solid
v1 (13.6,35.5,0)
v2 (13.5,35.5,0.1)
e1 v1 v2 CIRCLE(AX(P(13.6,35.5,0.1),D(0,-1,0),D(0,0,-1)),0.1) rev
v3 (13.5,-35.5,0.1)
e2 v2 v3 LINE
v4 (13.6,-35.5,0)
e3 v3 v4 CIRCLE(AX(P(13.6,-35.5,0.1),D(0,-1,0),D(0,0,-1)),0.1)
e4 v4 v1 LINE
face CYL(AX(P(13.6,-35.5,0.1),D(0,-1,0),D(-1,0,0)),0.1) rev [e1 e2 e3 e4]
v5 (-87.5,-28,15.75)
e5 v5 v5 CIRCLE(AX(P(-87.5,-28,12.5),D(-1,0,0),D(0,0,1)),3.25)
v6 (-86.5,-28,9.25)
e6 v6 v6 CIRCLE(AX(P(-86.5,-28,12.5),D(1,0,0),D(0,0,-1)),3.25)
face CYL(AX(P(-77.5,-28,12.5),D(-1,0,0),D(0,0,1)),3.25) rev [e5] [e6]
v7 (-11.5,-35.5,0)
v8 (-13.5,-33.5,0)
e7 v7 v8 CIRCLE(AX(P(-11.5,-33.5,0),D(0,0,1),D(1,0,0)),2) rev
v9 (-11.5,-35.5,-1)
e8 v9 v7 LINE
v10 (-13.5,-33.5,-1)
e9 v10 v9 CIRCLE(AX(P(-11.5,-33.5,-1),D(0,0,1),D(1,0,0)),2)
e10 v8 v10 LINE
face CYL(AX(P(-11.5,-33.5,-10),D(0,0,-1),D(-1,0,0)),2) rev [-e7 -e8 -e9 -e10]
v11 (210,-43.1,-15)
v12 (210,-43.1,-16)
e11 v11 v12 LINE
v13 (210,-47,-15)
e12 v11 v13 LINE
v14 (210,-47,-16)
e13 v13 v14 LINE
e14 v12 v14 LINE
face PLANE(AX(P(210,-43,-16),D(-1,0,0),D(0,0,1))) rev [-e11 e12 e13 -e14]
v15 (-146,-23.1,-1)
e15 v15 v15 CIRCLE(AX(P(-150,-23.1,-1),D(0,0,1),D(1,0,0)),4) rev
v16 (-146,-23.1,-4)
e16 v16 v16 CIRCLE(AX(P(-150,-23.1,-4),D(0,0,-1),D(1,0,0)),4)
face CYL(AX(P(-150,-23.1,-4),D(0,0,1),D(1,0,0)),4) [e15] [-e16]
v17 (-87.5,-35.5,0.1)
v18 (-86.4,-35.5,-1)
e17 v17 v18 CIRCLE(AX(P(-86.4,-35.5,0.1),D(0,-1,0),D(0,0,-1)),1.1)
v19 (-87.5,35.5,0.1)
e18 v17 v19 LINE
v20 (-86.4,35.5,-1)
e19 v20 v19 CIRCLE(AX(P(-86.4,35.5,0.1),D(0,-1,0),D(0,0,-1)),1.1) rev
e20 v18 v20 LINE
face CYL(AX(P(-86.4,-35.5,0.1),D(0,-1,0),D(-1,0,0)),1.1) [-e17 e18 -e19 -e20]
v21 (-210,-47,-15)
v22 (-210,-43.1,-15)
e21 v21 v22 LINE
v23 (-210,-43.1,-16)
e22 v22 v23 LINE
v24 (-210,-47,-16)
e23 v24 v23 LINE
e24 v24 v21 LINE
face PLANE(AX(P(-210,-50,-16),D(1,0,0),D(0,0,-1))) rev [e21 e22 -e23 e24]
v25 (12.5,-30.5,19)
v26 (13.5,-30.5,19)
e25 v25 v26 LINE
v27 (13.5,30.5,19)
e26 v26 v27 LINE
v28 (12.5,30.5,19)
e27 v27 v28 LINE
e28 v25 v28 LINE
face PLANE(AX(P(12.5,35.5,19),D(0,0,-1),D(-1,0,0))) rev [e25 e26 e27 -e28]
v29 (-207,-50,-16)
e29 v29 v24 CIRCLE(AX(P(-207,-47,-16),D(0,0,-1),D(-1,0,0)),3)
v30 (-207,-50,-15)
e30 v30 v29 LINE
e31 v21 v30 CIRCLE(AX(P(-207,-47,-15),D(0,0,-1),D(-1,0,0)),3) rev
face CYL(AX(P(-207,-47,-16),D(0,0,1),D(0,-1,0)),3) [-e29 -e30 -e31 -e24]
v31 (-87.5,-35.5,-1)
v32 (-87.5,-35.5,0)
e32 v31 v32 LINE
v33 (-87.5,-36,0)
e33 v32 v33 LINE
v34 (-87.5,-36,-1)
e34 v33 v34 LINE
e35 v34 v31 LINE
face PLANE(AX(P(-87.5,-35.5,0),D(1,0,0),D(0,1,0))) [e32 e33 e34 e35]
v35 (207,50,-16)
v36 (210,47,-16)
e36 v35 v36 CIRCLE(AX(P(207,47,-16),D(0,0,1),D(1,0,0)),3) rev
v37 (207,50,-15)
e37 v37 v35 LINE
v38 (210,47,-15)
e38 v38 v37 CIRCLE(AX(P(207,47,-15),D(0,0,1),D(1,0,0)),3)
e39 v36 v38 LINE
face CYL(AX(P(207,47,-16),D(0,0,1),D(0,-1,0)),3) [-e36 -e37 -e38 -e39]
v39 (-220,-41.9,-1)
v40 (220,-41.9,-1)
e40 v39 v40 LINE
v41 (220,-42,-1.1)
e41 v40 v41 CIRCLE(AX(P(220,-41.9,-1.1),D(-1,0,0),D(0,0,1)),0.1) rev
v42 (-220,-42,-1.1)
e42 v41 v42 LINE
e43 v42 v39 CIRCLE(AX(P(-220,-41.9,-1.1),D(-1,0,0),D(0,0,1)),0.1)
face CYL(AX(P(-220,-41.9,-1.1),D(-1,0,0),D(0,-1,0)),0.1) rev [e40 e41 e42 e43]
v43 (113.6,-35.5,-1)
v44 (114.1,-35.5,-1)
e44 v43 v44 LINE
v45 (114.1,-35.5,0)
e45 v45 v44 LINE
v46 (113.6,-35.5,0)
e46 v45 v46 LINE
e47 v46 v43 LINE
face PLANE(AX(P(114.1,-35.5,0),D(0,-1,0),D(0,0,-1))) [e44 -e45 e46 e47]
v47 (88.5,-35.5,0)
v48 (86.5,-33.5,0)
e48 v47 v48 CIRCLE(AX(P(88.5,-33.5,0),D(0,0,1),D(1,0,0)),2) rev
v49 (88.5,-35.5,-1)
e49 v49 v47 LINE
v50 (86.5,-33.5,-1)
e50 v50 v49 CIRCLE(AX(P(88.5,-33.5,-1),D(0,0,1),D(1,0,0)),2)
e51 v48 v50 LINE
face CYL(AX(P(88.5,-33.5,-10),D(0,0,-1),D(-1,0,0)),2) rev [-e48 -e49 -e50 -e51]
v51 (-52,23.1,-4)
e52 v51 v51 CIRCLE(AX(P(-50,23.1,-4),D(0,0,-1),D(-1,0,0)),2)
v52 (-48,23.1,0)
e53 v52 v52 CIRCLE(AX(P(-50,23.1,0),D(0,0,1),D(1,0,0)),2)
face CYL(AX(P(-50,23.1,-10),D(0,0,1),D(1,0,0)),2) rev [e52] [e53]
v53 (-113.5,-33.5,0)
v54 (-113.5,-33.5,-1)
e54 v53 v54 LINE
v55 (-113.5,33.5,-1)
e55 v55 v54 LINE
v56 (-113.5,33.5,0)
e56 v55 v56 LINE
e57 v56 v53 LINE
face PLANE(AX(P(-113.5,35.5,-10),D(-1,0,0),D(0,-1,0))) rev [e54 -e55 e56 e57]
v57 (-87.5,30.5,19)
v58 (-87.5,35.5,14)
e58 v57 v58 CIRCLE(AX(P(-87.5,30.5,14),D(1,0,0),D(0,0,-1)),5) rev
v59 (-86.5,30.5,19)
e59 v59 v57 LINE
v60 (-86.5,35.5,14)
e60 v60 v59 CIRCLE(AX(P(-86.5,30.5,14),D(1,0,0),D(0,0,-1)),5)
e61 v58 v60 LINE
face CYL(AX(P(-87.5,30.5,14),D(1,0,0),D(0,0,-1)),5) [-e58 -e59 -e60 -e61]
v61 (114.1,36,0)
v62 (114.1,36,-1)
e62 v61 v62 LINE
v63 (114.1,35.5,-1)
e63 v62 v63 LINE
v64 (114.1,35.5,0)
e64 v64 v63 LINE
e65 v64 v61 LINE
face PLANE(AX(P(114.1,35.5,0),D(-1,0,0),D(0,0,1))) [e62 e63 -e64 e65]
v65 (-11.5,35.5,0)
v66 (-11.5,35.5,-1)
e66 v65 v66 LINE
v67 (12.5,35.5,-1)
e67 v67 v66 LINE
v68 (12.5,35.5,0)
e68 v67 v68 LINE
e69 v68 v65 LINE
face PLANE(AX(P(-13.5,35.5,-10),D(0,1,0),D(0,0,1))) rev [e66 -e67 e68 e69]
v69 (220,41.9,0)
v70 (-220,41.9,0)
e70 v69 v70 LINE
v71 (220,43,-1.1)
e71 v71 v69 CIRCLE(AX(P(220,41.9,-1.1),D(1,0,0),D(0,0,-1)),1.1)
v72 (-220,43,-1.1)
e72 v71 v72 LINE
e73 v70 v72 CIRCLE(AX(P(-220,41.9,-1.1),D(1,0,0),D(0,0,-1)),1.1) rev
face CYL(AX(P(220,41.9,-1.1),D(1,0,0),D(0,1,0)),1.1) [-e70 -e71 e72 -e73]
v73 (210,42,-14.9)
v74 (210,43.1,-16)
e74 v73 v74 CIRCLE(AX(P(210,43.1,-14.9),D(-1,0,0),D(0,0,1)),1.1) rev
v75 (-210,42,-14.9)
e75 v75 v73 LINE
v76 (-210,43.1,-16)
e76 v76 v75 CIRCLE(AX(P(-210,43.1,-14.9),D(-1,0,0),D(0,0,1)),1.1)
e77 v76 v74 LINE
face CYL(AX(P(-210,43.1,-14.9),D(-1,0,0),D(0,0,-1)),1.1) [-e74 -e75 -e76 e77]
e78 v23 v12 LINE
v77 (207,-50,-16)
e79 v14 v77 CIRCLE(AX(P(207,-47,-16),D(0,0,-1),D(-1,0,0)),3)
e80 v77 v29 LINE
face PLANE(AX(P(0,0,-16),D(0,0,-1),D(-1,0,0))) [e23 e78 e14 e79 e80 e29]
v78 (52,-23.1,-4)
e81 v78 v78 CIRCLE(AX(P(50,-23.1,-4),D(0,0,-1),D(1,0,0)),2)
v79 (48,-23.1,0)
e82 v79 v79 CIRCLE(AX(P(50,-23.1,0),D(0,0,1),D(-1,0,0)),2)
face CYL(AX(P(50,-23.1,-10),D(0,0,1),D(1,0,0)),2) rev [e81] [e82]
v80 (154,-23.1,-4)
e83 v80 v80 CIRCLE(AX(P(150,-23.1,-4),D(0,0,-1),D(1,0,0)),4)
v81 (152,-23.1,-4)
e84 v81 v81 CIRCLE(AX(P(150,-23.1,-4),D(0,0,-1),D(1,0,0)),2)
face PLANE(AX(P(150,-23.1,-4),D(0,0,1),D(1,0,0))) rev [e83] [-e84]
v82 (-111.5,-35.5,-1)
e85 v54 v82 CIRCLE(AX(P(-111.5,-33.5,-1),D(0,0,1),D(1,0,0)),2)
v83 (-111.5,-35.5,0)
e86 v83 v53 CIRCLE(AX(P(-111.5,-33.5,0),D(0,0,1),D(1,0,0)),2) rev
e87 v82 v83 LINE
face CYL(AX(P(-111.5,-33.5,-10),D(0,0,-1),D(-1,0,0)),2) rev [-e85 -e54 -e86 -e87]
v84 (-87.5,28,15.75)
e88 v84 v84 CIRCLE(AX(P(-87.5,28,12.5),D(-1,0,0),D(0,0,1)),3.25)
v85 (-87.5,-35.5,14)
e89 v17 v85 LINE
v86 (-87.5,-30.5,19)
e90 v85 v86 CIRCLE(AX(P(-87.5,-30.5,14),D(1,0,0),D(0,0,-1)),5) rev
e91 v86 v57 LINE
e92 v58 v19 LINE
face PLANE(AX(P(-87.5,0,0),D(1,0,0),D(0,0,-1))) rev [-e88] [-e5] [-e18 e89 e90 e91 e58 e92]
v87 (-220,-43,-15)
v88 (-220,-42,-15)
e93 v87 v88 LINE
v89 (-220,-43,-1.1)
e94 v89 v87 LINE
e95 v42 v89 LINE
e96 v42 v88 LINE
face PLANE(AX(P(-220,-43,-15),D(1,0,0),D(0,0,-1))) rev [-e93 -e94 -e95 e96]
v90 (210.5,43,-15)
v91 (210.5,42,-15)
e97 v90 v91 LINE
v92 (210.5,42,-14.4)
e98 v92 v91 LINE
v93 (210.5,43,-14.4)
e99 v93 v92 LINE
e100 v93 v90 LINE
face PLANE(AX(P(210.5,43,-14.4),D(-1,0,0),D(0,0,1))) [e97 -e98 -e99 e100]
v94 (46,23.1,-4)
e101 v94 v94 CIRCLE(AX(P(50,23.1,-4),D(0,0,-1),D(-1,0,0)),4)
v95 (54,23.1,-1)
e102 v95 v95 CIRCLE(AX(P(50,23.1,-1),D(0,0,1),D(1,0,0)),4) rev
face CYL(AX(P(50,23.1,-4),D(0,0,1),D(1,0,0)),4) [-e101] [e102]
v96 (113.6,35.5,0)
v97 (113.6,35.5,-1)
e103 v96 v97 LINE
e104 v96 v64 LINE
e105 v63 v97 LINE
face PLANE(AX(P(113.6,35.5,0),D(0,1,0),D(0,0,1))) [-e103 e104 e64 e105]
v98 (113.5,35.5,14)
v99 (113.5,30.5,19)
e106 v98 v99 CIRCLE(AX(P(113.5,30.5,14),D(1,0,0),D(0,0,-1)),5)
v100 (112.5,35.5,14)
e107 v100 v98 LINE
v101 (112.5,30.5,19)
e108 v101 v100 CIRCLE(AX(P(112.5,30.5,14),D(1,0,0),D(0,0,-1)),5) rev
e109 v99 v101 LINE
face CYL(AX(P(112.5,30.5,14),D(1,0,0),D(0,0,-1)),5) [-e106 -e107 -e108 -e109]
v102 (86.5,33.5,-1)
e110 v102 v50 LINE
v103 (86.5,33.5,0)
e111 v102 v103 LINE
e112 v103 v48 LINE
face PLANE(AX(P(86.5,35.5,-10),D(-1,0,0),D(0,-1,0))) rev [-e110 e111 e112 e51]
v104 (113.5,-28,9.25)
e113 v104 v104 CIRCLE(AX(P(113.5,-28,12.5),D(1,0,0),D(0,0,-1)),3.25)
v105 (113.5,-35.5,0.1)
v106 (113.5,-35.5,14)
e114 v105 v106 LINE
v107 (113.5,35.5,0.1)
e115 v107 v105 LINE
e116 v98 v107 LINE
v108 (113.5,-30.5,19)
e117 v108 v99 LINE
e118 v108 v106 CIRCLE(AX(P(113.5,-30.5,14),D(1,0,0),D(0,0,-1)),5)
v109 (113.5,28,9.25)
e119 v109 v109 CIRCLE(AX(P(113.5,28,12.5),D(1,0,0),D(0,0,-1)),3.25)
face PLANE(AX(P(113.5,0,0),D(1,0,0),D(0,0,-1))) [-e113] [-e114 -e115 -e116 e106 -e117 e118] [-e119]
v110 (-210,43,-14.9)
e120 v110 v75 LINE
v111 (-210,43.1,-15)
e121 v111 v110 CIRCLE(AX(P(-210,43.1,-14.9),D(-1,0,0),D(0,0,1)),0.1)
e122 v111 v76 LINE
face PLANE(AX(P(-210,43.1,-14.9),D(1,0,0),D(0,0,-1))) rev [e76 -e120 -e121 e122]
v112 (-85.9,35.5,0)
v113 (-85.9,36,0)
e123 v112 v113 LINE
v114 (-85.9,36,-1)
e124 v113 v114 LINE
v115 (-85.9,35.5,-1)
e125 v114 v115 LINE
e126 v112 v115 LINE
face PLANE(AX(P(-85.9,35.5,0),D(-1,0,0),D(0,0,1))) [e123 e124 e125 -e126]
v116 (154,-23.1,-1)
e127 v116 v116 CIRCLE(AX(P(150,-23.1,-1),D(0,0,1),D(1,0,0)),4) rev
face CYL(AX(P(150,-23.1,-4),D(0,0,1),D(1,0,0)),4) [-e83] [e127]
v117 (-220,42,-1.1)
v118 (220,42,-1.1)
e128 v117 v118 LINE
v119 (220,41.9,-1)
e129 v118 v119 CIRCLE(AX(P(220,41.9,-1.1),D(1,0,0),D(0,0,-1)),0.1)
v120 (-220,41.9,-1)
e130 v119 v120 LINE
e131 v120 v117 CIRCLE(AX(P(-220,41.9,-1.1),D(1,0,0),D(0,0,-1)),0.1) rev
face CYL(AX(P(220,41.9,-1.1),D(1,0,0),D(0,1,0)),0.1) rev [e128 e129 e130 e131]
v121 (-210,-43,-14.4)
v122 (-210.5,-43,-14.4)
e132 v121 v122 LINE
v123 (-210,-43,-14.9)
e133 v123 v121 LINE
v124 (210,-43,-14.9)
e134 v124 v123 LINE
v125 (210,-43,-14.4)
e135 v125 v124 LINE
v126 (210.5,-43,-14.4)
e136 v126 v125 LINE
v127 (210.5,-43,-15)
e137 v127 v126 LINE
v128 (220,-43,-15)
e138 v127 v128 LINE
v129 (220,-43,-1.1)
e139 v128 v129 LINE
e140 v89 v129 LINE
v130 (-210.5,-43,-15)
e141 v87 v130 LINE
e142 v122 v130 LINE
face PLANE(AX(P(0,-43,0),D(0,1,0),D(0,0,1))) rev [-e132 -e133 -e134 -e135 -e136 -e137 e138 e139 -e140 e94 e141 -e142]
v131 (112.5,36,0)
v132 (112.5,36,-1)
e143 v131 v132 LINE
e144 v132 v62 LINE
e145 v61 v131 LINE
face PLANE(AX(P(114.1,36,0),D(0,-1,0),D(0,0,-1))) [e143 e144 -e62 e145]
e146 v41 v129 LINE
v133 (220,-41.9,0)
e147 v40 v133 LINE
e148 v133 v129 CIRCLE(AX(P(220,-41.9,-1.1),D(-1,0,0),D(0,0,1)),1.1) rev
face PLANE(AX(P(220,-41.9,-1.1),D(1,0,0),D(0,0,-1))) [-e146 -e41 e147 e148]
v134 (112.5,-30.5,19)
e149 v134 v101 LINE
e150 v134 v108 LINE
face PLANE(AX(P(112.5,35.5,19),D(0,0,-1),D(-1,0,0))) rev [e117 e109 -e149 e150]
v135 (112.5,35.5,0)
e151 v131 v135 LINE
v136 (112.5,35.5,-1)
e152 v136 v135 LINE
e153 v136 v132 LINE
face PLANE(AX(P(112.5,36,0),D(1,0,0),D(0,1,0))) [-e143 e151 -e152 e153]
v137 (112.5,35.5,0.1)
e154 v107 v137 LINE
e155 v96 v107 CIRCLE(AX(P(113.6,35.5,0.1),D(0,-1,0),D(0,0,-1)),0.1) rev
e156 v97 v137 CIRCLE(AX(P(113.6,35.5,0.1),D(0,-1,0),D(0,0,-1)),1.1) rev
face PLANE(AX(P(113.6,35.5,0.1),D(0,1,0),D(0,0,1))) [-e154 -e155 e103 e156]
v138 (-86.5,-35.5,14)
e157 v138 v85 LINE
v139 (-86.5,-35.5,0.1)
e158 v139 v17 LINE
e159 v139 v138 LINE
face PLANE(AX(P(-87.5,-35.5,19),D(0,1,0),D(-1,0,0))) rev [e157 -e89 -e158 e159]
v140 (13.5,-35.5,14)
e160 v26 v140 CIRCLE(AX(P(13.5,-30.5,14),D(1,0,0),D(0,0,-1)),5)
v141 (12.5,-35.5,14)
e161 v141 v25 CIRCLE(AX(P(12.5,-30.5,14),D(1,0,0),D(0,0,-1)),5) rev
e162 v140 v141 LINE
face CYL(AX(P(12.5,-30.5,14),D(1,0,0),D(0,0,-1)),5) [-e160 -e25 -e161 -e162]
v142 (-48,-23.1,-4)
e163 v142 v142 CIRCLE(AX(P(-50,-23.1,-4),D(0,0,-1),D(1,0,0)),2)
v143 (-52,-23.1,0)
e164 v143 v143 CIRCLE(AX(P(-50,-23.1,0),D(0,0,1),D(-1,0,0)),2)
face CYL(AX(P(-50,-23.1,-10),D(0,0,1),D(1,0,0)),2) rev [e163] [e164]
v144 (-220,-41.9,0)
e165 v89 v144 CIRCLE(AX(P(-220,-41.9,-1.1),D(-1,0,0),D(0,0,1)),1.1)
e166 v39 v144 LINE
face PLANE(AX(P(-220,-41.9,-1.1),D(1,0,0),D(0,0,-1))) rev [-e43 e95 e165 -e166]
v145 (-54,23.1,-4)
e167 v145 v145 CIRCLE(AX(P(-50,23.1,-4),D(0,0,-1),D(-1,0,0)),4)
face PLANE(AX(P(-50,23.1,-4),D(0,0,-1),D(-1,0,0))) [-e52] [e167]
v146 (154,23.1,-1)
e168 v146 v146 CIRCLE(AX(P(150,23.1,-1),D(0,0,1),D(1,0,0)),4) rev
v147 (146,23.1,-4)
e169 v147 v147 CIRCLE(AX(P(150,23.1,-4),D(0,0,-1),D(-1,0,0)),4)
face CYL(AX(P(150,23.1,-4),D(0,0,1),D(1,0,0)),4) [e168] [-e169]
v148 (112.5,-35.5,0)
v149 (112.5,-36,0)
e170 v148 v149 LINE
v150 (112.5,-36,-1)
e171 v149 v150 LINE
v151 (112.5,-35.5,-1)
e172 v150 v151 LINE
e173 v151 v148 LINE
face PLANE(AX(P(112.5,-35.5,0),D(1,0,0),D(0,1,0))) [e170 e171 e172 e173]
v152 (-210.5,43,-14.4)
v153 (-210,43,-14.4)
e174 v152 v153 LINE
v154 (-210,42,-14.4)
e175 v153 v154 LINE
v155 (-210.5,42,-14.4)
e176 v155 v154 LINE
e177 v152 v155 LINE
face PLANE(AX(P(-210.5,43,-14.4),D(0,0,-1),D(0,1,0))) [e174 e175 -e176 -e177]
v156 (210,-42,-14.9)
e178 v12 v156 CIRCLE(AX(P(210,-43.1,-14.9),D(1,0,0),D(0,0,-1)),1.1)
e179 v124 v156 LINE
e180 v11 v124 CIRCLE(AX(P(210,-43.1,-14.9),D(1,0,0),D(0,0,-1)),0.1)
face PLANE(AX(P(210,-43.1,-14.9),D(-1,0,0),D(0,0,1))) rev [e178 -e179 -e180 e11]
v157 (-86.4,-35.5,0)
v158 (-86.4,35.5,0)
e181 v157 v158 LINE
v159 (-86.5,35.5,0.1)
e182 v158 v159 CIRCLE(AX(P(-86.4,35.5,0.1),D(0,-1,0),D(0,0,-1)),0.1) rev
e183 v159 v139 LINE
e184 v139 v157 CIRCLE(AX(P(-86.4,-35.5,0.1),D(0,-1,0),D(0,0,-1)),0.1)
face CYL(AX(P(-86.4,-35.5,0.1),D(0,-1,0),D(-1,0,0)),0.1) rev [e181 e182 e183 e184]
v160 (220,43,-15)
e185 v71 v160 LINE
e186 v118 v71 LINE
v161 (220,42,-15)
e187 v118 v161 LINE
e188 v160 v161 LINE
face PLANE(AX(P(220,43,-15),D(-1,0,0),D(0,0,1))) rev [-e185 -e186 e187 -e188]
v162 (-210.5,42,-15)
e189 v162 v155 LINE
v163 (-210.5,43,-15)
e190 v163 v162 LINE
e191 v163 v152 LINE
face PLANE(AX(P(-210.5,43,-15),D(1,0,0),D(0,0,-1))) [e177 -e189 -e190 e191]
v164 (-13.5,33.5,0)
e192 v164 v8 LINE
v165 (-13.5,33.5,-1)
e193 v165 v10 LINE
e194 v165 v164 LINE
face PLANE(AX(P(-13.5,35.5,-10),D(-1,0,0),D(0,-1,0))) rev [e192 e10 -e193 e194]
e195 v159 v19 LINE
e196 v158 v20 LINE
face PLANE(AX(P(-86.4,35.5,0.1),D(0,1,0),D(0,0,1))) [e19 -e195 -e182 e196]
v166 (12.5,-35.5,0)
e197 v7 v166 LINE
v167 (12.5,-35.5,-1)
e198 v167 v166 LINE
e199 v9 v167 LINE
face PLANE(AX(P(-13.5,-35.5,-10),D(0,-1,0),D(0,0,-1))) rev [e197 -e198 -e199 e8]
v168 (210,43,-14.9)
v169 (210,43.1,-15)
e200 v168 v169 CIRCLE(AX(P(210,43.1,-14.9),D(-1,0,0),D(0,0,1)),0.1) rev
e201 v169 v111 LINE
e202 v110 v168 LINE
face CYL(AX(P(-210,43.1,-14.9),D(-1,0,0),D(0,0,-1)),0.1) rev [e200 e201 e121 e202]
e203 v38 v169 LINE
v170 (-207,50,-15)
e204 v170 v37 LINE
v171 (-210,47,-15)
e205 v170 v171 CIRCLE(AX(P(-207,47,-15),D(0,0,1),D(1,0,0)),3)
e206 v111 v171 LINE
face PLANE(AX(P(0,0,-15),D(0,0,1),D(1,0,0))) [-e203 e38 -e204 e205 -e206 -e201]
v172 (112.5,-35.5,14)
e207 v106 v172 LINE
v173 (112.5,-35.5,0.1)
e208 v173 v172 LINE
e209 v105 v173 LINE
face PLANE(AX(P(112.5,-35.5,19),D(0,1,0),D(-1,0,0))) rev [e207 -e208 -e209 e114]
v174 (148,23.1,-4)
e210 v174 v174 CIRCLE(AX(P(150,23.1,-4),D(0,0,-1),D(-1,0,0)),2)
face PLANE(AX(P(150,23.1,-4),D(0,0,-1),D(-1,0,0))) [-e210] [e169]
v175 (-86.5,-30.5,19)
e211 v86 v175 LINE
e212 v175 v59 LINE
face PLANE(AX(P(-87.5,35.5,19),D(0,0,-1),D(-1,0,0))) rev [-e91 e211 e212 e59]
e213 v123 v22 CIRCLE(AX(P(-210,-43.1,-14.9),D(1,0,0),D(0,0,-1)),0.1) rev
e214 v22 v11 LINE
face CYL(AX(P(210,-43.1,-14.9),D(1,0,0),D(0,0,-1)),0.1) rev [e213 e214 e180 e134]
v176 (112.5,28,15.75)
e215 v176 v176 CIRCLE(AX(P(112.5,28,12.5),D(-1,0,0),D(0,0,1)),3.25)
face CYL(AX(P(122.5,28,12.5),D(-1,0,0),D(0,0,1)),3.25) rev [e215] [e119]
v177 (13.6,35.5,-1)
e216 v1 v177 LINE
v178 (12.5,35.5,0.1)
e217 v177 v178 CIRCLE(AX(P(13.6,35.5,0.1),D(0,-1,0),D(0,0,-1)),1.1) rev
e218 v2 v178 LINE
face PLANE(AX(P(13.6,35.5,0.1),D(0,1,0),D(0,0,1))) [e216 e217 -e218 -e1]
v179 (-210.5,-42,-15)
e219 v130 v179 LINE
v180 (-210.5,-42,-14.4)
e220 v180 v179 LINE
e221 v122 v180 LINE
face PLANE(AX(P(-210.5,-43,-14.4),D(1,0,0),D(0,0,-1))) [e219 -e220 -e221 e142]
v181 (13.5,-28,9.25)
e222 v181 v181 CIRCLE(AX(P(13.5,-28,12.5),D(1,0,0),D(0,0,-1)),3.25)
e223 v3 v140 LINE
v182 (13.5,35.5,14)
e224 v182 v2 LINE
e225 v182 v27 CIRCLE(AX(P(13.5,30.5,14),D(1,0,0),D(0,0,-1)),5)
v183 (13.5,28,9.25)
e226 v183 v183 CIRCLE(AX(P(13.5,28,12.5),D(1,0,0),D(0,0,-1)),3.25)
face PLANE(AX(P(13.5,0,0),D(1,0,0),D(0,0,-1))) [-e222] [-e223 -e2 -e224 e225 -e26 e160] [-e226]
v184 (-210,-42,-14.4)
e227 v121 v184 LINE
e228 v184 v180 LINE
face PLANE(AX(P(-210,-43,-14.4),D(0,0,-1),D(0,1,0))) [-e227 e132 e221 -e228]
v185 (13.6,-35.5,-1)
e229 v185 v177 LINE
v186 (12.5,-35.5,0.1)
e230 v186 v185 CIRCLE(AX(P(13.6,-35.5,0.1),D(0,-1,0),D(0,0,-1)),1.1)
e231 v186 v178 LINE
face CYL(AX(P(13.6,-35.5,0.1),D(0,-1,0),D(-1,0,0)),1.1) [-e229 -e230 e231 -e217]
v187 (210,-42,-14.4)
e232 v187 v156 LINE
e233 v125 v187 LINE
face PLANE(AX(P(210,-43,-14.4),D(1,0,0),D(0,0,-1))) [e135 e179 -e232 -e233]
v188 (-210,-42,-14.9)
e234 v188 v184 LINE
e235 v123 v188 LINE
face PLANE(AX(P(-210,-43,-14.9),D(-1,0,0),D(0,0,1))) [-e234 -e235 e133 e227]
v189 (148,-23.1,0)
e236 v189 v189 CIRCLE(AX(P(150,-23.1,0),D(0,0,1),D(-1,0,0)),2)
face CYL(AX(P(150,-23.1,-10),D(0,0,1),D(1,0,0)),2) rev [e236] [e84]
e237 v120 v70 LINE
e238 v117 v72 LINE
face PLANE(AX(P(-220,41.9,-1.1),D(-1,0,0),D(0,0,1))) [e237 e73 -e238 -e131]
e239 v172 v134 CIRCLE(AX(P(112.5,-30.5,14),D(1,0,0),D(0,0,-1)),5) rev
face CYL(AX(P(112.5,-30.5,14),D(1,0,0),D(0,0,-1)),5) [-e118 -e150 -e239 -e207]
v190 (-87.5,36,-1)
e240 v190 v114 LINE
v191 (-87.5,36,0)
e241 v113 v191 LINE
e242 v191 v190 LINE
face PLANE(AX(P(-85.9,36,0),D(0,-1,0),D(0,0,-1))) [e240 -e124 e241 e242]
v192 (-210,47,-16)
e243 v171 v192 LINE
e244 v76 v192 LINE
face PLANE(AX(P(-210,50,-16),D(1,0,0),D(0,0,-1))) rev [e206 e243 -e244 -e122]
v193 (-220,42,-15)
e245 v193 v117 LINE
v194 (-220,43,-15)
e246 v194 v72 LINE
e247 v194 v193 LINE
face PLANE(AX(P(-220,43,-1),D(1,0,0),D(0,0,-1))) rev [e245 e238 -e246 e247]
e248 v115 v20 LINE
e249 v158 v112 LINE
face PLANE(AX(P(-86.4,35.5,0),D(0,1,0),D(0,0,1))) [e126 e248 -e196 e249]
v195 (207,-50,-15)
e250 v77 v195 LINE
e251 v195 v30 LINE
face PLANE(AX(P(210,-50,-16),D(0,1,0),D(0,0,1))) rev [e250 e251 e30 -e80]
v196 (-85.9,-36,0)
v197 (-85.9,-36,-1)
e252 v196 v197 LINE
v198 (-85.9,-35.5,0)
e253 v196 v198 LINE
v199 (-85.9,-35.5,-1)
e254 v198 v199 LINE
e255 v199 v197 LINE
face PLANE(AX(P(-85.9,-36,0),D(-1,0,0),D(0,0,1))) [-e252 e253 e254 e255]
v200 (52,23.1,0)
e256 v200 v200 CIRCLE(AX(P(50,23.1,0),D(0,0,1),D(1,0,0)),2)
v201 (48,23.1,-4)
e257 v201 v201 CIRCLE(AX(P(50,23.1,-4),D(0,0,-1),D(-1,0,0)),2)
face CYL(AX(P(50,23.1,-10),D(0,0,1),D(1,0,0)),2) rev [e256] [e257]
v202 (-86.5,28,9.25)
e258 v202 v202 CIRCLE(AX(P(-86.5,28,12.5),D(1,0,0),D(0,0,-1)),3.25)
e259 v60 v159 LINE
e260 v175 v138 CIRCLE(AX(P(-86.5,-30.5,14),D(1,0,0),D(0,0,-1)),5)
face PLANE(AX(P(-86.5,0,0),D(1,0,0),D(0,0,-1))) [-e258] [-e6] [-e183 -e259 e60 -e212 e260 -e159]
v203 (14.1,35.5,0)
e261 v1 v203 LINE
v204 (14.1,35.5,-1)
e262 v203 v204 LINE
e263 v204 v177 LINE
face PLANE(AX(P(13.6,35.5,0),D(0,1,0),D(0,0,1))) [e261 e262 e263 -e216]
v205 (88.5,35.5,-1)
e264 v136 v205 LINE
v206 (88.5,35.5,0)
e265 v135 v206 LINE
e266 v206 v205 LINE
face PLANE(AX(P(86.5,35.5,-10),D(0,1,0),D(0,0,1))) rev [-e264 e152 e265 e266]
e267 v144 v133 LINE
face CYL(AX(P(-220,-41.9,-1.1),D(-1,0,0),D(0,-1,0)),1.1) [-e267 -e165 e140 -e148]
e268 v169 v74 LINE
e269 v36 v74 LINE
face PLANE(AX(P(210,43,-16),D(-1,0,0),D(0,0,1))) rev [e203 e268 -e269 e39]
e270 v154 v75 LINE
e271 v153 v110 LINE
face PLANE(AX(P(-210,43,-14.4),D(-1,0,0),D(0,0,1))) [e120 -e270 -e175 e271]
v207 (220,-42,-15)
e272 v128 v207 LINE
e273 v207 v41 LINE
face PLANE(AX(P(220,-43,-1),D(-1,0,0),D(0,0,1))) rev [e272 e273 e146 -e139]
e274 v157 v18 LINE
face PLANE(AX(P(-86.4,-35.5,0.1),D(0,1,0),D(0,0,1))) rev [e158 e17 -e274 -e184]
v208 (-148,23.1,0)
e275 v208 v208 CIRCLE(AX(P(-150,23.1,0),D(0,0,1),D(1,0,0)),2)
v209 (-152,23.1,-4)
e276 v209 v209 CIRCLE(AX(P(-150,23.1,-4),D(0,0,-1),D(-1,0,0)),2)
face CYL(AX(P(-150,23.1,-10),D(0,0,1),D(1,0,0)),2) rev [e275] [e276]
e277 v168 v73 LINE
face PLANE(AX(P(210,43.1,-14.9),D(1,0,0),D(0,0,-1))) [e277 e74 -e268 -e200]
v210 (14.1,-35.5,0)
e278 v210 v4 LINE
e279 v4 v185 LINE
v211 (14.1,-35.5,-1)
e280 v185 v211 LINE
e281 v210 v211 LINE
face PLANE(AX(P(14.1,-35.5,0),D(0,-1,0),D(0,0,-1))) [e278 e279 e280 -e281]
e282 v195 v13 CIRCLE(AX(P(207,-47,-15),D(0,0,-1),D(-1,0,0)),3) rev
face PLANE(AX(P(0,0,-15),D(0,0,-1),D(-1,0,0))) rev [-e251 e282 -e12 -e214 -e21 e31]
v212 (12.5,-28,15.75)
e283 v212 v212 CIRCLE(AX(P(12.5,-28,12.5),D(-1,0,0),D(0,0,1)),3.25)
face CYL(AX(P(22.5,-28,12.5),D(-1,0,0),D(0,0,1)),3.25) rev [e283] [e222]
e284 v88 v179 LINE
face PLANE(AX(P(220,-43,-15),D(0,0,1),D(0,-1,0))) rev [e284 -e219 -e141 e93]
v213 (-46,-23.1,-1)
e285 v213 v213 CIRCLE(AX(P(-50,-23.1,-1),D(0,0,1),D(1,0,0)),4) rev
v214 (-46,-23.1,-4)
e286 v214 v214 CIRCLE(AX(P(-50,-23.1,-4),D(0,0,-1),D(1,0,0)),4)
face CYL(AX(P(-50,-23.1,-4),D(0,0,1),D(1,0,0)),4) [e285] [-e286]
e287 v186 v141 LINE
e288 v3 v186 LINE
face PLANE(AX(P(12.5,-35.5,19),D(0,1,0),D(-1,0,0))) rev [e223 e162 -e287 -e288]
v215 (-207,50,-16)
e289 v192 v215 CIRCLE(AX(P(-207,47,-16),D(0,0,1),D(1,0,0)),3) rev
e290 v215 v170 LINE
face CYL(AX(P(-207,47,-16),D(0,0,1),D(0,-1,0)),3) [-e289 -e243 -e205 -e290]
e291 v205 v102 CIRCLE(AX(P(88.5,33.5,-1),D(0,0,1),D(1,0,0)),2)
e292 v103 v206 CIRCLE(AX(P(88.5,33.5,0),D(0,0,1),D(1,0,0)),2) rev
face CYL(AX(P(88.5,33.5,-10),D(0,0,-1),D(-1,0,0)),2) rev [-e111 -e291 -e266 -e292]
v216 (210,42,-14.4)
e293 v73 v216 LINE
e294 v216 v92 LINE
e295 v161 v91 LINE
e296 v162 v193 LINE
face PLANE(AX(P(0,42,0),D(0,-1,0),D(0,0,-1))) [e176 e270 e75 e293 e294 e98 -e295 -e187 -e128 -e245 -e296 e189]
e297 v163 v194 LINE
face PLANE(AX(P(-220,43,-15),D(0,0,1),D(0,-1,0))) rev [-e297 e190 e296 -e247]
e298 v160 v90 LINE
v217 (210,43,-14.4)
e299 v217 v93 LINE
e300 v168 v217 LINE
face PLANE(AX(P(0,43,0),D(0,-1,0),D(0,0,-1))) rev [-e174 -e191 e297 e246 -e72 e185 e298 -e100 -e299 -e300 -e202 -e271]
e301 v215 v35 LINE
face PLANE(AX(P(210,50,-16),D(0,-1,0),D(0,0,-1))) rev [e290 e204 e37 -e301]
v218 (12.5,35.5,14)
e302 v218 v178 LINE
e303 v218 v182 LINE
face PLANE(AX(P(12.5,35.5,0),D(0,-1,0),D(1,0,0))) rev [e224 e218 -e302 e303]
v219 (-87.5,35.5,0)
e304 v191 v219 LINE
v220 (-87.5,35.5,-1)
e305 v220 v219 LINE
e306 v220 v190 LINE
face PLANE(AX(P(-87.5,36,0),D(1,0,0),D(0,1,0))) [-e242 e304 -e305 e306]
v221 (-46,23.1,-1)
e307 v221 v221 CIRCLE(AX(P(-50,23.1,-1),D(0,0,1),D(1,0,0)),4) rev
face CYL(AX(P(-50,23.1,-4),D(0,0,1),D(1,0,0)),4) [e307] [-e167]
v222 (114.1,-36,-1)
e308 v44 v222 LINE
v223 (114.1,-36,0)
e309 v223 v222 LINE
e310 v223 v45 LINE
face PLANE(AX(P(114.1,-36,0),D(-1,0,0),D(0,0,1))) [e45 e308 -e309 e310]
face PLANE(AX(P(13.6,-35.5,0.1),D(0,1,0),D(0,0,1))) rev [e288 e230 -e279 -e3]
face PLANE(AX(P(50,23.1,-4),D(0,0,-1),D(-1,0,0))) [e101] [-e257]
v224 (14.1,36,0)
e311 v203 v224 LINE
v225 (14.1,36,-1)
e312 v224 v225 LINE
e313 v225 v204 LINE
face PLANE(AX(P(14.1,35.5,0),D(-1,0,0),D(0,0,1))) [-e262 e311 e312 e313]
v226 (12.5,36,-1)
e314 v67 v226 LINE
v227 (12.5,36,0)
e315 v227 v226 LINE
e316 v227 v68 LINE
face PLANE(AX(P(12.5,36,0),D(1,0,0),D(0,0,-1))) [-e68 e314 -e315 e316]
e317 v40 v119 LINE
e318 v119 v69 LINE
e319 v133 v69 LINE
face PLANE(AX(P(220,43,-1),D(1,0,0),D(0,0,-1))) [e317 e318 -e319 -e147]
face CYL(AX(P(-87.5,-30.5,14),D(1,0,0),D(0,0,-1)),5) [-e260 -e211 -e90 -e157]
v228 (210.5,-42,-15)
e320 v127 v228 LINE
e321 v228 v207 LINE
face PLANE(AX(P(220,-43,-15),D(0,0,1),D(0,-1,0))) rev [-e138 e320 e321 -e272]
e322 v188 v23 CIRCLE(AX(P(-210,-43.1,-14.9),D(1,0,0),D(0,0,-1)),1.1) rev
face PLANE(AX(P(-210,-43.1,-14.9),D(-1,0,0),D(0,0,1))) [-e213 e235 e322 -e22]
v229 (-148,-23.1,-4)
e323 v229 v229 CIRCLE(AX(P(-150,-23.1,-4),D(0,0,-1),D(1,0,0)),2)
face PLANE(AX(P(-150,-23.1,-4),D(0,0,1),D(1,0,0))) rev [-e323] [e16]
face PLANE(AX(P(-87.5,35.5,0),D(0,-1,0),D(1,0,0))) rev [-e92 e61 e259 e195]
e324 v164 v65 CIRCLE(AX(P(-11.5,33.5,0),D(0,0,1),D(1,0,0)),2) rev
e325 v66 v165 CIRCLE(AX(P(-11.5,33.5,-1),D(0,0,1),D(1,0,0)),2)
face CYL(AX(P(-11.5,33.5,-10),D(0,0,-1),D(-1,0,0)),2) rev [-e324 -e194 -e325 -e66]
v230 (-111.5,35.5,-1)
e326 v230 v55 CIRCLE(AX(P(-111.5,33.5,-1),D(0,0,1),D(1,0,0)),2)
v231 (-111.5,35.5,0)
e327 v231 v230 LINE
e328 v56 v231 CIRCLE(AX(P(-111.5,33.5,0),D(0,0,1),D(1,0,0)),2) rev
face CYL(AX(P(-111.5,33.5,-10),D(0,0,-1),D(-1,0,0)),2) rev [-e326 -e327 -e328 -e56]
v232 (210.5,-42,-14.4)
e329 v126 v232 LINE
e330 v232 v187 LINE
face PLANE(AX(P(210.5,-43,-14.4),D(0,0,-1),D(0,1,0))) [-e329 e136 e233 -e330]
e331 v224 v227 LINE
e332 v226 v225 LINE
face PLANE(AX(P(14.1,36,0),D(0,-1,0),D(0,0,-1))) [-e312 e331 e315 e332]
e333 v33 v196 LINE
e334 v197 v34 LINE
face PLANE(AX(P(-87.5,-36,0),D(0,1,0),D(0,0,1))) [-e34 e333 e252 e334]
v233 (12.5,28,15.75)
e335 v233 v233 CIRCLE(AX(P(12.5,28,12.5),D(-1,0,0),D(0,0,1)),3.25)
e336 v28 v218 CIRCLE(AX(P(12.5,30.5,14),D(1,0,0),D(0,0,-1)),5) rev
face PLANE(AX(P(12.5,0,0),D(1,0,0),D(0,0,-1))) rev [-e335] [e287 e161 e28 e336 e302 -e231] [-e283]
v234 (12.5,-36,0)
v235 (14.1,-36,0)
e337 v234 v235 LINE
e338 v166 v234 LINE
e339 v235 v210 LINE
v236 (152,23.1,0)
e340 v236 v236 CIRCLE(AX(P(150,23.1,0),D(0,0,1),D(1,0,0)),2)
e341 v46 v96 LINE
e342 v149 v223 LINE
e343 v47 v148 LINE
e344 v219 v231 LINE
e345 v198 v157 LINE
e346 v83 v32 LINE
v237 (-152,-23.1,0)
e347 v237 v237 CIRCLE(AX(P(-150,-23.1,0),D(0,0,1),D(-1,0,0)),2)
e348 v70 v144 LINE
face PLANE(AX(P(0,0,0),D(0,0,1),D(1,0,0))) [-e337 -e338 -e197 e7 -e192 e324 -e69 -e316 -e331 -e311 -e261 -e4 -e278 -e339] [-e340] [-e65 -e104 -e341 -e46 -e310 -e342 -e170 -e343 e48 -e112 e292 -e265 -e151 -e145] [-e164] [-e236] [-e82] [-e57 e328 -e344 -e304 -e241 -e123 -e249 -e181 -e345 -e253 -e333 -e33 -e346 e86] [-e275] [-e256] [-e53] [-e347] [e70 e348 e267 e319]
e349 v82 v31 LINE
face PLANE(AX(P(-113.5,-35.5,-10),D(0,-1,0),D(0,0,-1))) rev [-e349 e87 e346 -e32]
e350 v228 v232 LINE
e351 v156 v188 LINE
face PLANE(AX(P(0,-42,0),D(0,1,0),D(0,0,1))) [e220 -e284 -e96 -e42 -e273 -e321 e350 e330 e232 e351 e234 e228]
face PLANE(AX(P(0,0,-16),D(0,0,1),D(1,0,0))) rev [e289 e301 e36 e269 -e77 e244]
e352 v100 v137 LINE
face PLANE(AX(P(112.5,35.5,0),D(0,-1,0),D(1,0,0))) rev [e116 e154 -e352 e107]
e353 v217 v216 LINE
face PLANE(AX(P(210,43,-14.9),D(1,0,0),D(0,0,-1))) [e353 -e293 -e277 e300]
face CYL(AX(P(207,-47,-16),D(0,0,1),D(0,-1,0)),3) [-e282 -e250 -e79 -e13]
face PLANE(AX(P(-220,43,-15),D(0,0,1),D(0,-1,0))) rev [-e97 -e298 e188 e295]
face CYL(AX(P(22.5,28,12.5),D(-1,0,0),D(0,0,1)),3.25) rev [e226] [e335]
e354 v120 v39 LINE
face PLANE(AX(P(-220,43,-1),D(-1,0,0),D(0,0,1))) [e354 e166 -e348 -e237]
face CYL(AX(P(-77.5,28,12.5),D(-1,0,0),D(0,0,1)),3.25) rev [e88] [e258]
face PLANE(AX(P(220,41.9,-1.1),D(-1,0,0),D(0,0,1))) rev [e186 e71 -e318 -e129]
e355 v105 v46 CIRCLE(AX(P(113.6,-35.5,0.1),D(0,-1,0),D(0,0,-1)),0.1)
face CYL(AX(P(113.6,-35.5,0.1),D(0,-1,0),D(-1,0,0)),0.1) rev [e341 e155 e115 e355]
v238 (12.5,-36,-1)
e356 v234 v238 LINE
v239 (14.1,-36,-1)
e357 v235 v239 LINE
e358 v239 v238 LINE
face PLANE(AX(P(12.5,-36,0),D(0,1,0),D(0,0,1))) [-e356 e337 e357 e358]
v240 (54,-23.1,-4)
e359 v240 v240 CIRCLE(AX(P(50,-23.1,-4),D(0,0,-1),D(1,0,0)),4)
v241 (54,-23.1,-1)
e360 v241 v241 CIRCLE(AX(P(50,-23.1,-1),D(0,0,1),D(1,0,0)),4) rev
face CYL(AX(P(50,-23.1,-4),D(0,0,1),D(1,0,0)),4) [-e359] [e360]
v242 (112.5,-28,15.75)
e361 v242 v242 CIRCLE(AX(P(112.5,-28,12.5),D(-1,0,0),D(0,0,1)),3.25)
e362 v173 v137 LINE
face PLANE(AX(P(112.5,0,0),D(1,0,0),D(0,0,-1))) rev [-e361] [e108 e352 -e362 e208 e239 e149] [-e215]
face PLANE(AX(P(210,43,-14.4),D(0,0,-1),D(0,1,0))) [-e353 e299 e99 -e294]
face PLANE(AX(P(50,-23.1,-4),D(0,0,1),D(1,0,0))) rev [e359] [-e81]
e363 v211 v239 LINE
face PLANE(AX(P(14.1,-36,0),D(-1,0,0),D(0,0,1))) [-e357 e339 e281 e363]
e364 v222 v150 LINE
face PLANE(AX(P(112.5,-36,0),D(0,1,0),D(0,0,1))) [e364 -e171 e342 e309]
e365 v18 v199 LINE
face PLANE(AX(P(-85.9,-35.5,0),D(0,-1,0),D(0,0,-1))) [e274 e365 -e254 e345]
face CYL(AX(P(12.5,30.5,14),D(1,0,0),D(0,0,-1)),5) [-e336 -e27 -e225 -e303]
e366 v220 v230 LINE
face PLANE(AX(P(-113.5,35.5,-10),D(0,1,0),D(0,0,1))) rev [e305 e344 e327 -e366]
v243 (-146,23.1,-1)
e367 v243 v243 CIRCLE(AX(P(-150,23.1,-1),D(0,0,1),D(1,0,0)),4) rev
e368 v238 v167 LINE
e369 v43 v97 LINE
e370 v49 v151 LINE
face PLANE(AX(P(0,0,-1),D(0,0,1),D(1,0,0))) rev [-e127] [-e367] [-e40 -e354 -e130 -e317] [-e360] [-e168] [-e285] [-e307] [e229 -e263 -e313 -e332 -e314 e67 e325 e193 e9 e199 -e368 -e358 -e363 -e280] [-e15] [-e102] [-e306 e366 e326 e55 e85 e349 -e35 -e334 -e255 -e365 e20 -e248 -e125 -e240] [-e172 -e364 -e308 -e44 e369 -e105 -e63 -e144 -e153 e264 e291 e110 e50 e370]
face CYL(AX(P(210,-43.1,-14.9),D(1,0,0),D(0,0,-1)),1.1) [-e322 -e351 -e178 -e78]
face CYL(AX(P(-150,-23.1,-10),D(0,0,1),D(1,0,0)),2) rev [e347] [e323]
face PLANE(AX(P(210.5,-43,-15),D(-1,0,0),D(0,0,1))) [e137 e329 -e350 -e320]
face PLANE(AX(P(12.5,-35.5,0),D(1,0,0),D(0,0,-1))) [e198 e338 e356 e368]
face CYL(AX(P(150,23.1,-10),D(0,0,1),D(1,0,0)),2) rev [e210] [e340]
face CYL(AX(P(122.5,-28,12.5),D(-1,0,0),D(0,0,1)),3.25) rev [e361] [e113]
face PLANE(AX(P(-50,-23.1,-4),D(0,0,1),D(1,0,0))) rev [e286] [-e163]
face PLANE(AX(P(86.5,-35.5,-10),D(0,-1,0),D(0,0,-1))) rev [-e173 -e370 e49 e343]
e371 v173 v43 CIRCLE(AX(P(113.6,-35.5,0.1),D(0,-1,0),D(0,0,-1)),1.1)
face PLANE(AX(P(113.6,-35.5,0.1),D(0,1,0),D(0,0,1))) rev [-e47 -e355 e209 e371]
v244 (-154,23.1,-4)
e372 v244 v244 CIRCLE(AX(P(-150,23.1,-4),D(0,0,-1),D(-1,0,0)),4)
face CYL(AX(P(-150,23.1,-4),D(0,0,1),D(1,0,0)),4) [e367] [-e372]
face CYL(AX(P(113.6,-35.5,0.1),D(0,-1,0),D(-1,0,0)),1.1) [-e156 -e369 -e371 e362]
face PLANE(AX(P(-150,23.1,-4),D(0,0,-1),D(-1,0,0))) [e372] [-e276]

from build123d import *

# Parameters (mm, degrees)
SKETCH_1_W                          = 440
SKETCH_1_H                          = 86
SM_BASE_FLANGE_1_DEPTH              = 1
SM_EDGE_FLANGE_1_STRIP_W            = 4.2
SM_EDGE_FLANGE_1_STRIP_H            = 1
SM_EDGE_FLANGE_1_STRIP_CUT_DEPTH    = 440
SM_EDGE_FLANGE_1_STRIP_2_W          = 4.2
SM_EDGE_FLANGE_1_STRIP_2_H          = 1
SM_EDGE_FLANGE_1_STRIP_CUT_2_DEPTH  = 440
SM_EDGE_FLANGE_1_DEPTH              = 440
SM_EDGE_FLANGE_1_BEND_DEPTH         = 440
SM_EDGE_FLANGE_2_STRIP_W            = 5.2
SM_EDGE_FLANGE_2_STRIP_H            = 1
SM_EDGE_FLANGE_2_STRIP_CUT_DEPTH    = 420
SM_EDGE_FLANGE_2_RELIEF_W           = 5.7
SM_EDGE_FLANGE_2_RELIEF_H           = 0.5
SM_EDGE_FLANGE_2_RELIEF_CUT_DEPTH   = 1
SM_EDGE_FLANGE_2_STRIP_2_W          = 5.2
SM_EDGE_FLANGE_2_STRIP_2_H          = 1
SM_EDGE_FLANGE_2_STRIP_CUT_2_DEPTH  = 420
SM_EDGE_FLANGE_2_RELIEF_2_W         = 5.7
SM_EDGE_FLANGE_2_RELIEF_2_H         = 0.5
SM_EDGE_FLANGE_2_RELIEF_CUT_2_DEPTH = 1
SM_EDGE_FLANGE_2_DEPTH              = 420
SM_EDGE_FLANGE_2_BEND_DEPTH         = 420
SKETCH_18_W                         = 26
SKETCH_18_H                         = 71
CUT_EXTRUDE_1_DEPTH                 = 10
SM_START                            = -36
SM_EDGE_FLANGE_3_DEPTH              = 72
SM_EDGE_FLANGE_3_2_DEPTH            = 0.5
SM_START_2                          = 35.5
SM_EDGE_FLANGE_3_3_DEPTH            = 0.5
SM_START_3                          = -35.5
SM_EDGE_FLANGE_3_4_DEPTH            = 71
SKETCH_22_R                         = 3.25
CUT_EXTRUDE_2_DEPTH                 = 10
FILLET_1_R                          = 5
PATTERN_LINEAR_4_COUNT              = 2
PATTERN_LINEAR_4_PITCH              = 100
FILLET_1_OF_PATTERN_LINEAR_4_R      = 5
PATTERN_LINEAR_5_COUNT              = 2
PATTERN_LINEAR_5_PITCH              = 100
FILLET_1_OF_PATTERN_LINEAR_5_R      = 5
FILLET_2_R                          = 3
FILLET_3_R                          = 2
SKETCH_23_R                         = 2
CUT_EXTRUDE_3_DEPTH                 = 10
SKETCH_24_R                         = 4
SKETCH_24_R_2                       = 2
EXTRUDE_1_DEPTH                     = 3


# Read off the part's stored shape, not the designer's step: 边线-法兰3
# Sheet-metal steps are written as plain solids
with BuildPart() as part:
    # Sketch 1 → 基体-法兰1 (new body)
    with BuildSketch(Plane.XY):
        Rectangle(SKETCH_1_W, SKETCH_1_H)
    extrude(amount=-SM_BASE_FLANGE_1_DEPTH)

    # 边线-法兰1 strip (across the edge) → 边线-法兰1 strip cut (cut)
    with BuildSketch(Plane(origin=(-220, 43, -1), x_dir=(0, -1, 0), z_dir=(1, 0, 0))):
        with Locations((-1, -0.5)):
            Rectangle(SM_EDGE_FLANGE_1_STRIP_W, SM_EDGE_FLANGE_1_STRIP_H)
    extrude(amount=SM_EDGE_FLANGE_1_STRIP_CUT_DEPTH, mode=Mode.SUBTRACT)

    # 边线-法兰1 strip 2 (across the edge) → 边线-法兰1 strip cut 2 (cut)
    with BuildSketch(Plane(origin=(220, -43, -1), x_dir=(0, 1, 0), z_dir=(-1, 0, 0))):
        with Locations((-1, -0.5)):
            Rectangle(SM_EDGE_FLANGE_1_STRIP_2_W, SM_EDGE_FLANGE_1_STRIP_2_H)
    extrude(amount=SM_EDGE_FLANGE_1_STRIP_CUT_2_DEPTH, mode=Mode.SUBTRACT)

    # 边线-法兰1 section (across the edge) → 边线-法兰1 (add)
    with BuildSketch(Plane(origin=(-220, 43, -1), x_dir=(0, -1, 0), z_dir=(1, 0, 0))):
        with BuildLine():
            Line((0, 0.1), (0, 14))
            Line((0, 14), (1, 14))
            Line((1, 14), (1, 0.1))
            ThreePointArc((1, 0.1), (1.029289322, 0.029289322), (1.1, 0))
            Line((1.1, 0), (1.1, -1))
            ThreePointArc((1.1, -1), (0.322182541, -0.677817459), (0, 0.1))
        make_face()
    extrude(amount=SM_EDGE_FLANGE_1_DEPTH)

    # 边线-法兰1 section 2 (across the edge) → 边线-法兰1 bend (add)
    with BuildSketch(Plane(origin=(220, -43, -1), x_dir=(0, 1, 0), z_dir=(-1, 0, 0))):
        with BuildLine():
            Line((0, 0.1), (0, 14))
            Line((0, 14), (1, 14))
            Line((1, 14), (1, 0.1))
            ThreePointArc((1, 0.1), (1.029289322, 0.029289322), (1.1, 0))
            Line((1.1, 0), (1.1, -1))
            ThreePointArc((1.1, -1), (0.322182541, -0.677817459), (0, 0.1))
        make_face()
    extrude(amount=SM_EDGE_FLANGE_1_BEND_DEPTH)

    # 边线-法兰2 strip (across the edge) → 边线-法兰2 strip cut (cut)
    with BuildSketch(Plane(origin=(210, 43, -16), x_dir=(0, 0, 1), z_dir=(-1, 0, 0))):
        with Locations((-1.5, -0.5)):
            Rectangle(SM_EDGE_FLANGE_2_STRIP_W, SM_EDGE_FLANGE_2_STRIP_H)
    extrude(amount=SM_EDGE_FLANGE_2_STRIP_CUT_DEPTH, mode=Mode.SUBTRACT)

    # 边线-法兰2 relief (on the sheet) → 边线-法兰2 relief cut (cut)
    with BuildSketch(Plane(origin=(210, 43, -14.9), x_dir=(0, 0, 1), z_dir=(0, 1, 0))):
        with Locations((-2.35, 0.25)):
            Rectangle(SM_EDGE_FLANGE_2_RELIEF_W, SM_EDGE_FLANGE_2_RELIEF_H)
        with Locations((-2.35, -420.25)):
            Rectangle(SM_EDGE_FLANGE_2_RELIEF_W, SM_EDGE_FLANGE_2_RELIEF_H)
    extrude(amount=-SM_EDGE_FLANGE_2_RELIEF_CUT_DEPTH, mode=Mode.SUBTRACT)

    # 边线-法兰2 strip 2 (across the edge) → 边线-法兰2 strip cut 2 (cut)
    with BuildSketch(Plane(origin=(-210, -43, -16), x_dir=(0, 0, 1), z_dir=(1, 0, 0))):
        with Locations((-1.5, -0.5)):
            Rectangle(SM_EDGE_FLANGE_2_STRIP_2_W, SM_EDGE_FLANGE_2_STRIP_2_H)
    extrude(amount=SM_EDGE_FLANGE_2_STRIP_CUT_2_DEPTH, mode=Mode.SUBTRACT)

    # 边线-法兰2 relief 2 (on the sheet) → 边线-法兰2 relief cut 2 (cut)
    with BuildSketch(Plane(origin=(-210, -43, -14.9), x_dir=(0, 0, 1), z_dir=(0, -1, 0))):
        with Locations((-2.35, 0.25)):
            Rectangle(SM_EDGE_FLANGE_2_RELIEF_2_W, SM_EDGE_FLANGE_2_RELIEF_2_H)
        with Locations((-2.35, -420.25)):
            Rectangle(SM_EDGE_FLANGE_2_RELIEF_2_W, SM_EDGE_FLANGE_2_RELIEF_2_H)
    extrude(amount=-SM_EDGE_FLANGE_2_RELIEF_CUT_2_DEPTH, mode=Mode.SUBTRACT)

    # 边线-法兰2 section (across the edge) → 边线-法兰2 (add)
    with BuildSketch(Plane(origin=(210, 43, -16), x_dir=(0, 0, 1), z_dir=(-1, 0, 0))):
        with BuildLine():
            Line((0, 0.1), (0, 7))
            Line((0, 7), (1, 7))
            Line((1, 7), (1, 0.1))
            ThreePointArc((1, 0.1), (1.029289322, 0.029289322), (1.1, 0))
            Line((1.1, 0), (1.1, -1))
            ThreePointArc((1.1, -1), (0.322182541, -0.677817459), (0, 0.1))
        make_face()
    extrude(amount=SM_EDGE_FLANGE_2_DEPTH)

    # 边线-法兰2 section 2 (across the edge) → 边线-法兰2 bend (add)
    with BuildSketch(Plane(origin=(-210, -43, -16), x_dir=(0, 0, 1), z_dir=(1, 0, 0))):
        with BuildLine():
            Line((0, 0.1), (0, 7))
            Line((0, 7), (1, 7))
            Line((1, 7), (1, 0.1))
            ThreePointArc((1, 0.1), (1.029289322, 0.029289322), (1.1, 0))
            Line((1.1, 0), (1.1, -1))
            ThreePointArc((1.1, -1), (0.322182541, -0.677817459), (0, 0.1))
        make_face()
    extrude(amount=SM_EDGE_FLANGE_2_BEND_DEPTH)

    # 草图18 → 切除-拉伸1 (cut)
    with BuildSketch(Plane.XY):
        with Locations((-0.5, 0)):
            Rectangle(SKETCH_18_W, SKETCH_18_H)
    cut_extrude_1 = extrude(amount=-CUT_EXTRUDE_1_DEPTH, mode=Mode.SUBTRACT)

    # 边线-法兰3 outline → 边线-法兰3 (cut)
    with BuildSketch(Plane(origin=(0, 0, 0), x_dir=(1, 0, 0), z_dir=(0, 1, 0)).offset(SM_START)):
        with BuildLine():
            ThreePointArc((12.504554885, 0), (12.858380152, 0.71240384), (13.6, 1))
            Line((13.6, 1), (12.5, 1))
            Line((12.5, 1), (12.5, 0))
            Line((12.5, 0), (12.504554885, 0))
        make_face()
    sm_edge_flange_3 = extrude(amount=SM_EDGE_FLANGE_3_DEPTH, mode=Mode.SUBTRACT)

    # Sm Edge Flange 3 2 outline → Sm Edge Flange 3 2 (cut)
    with BuildSketch(Plane(origin=(0, 0, 0), x_dir=(1, 0, 0), z_dir=(0, 1, 0)).offset(SM_START)):
        with BuildLine():
            Line((14.1, 0), (14.1, 1))
            Line((14.1, 1), (13.6, 1))
            ThreePointArc((13.6, 1), (12.858380152, 0.71240384), (12.504554885, 0))
            Line((12.504554885, 0), (14.1, 0))
        make_face()
    sm_edge_flange_3_2 = extrude(amount=SM_EDGE_FLANGE_3_2_DEPTH, mode=Mode.SUBTRACT)

    # Sm Edge Flange 3 3 outline → Sm Edge Flange 3 3 (cut)
    with BuildSketch(Plane(origin=(0, 0, 0), x_dir=(1, 0, 0), z_dir=(0, 1, 0)).offset(SM_START_2)):
        with BuildLine():
            Line((14.1, 0), (14.1, 1))
            Line((14.1, 1), (13.6, 1))
            ThreePointArc((13.6, 1), (12.858380152, 0.71240384), (12.504554885, 0))
            Line((12.504554885, 0), (14.1, 0))
        make_face()
    sm_edge_flange_3_3 = extrude(amount=SM_EDGE_FLANGE_3_3_DEPTH, mode=Mode.SUBTRACT)

    # Sm Edge Flange 3 4 outline → Sm Edge Flange 3 4 (add)
    with BuildSketch(Plane(origin=(0, 0, 0), x_dir=(1, 0, 0), z_dir=(0, 1, 0)).offset(SM_START_3)):
        with BuildLine():
            ThreePointArc((13.5, -0.1), (13.529289322, -0.029289322), (13.6, 0))
            Line((13.6, 0), (12.504554885, 0))
            ThreePointArc((12.504554885, 0), (12.501139311, -0.049948159), (12.5, -0.1))
            Line((12.5, -0.1), (12.5, -19))
            Line((12.5, -19), (13.5, -19))
            Line((13.5, -19), (13.5, -0.1))
        make_face()
    sm_edge_flange_3_4 = extrude(amount=SM_EDGE_FLANGE_3_4_DEPTH)

    # 草图22 → 切除-拉伸2 (cut)
    with BuildSketch(Plane.ZY.offset(-12.5)):
        with Locations((12.5, 28)):
            Circle(SKETCH_22_R)
        with Locations((12.5, -28)):
            Circle(SKETCH_22_R)
    cut_extrude_2 = extrude(amount=-CUT_EXTRUDE_2_DEPTH, mode=Mode.SUBTRACT)

    # 圆角1
    fillet_1_edges = [part.edges().sort_by_distance(p)[0] for p in [
        (13, 35.5, 19),
        (13, -35.5, 19),
    ]]
    fillet(fillet_1_edges, radius=FILLET_1_R)

    # 阵列(线性)4: 切除-拉伸1, 边线-法兰3, Sm Edge Flange 3 2, Sm Edge Flange 3 3, Sm Edge Flange 3 4, 切除-拉伸2 ×2
    with Locations(*[(i * PATTERN_LINEAR_4_PITCH, 0, 0) for i in range(1, PATTERN_LINEAR_4_COUNT)]):
        add(cut_extrude_1, mode=Mode.SUBTRACT)
        add(sm_edge_flange_3, mode=Mode.SUBTRACT)
        add(sm_edge_flange_3_2, mode=Mode.SUBTRACT)
        add(sm_edge_flange_3_3, mode=Mode.SUBTRACT)
        add(sm_edge_flange_3_4)
        add(cut_extrude_2, mode=Mode.SUBTRACT)

    # 圆角1 of 阵列(线性)4
    fillet_1_of_pattern_linear_4_edges = [part.edges().sort_by_distance(p)[0] for p in [
        (113, 35.5, 19),
        (113, -35.5, 19),
    ]]
    fillet(fillet_1_of_pattern_linear_4_edges, radius=FILLET_1_OF_PATTERN_LINEAR_4_R)

    # 阵列(线性)5: 切除-拉伸1, 边线-法兰3, Sm Edge Flange 3 2, Sm Edge Flange 3 3, Sm Edge Flange 3 4, 切除-拉伸2 ×2
    with Locations(*[(-i * PATTERN_LINEAR_5_PITCH, 0, 0) for i in range(1, PATTERN_LINEAR_5_COUNT)]):
        add(cut_extrude_1, mode=Mode.SUBTRACT)
        add(sm_edge_flange_3, mode=Mode.SUBTRACT)
        add(sm_edge_flange_3_2, mode=Mode.SUBTRACT)
        add(sm_edge_flange_3_3, mode=Mode.SUBTRACT)
        add(sm_edge_flange_3_4)
        add(cut_extrude_2, mode=Mode.SUBTRACT)

    # 圆角1 of 阵列(线性)5
    fillet_1_of_pattern_linear_5_edges = [part.edges().sort_by_distance(p)[0] for p in [
        (-87, 35.5, 19),
        (-87, -35.5, 19),
    ]]
    fillet(fillet_1_of_pattern_linear_5_edges, radius=FILLET_1_OF_PATTERN_LINEAR_5_R)

    # 圆角2
    fillet_2_edges = [part.edges().sort_by_distance(p)[0] for p in [
        (210, 50, -15.5),
        (-210, 50, -15.5),
        (-210, -50, -15.5),
        (210, -50, -15.5),
    ]]
    fillet(fillet_2_edges, radius=FILLET_2_R)

    # 圆角3
    fillet_3_edges = [part.edges().sort_by_distance(p)[0] for p in [
        (-13.5, -35.5, -0.5),
        (-13.5, 35.5, -0.5),
        (86.5, -35.5, -0.5),
        (86.5, 35.5, -0.5),
        (-113.5, -35.5, -0.5),
        (-113.5, 35.5, -0.5),
    ]]
    fillet(fillet_3_edges, radius=FILLET_3_R)

    # 草图23 → 切除-拉伸3 (cut)
    with BuildSketch(Plane.XY):
        with Locations((-150, 23.1)):
            Circle(SKETCH_23_R)
        with Locations((-150, -23.1)):
            Circle(SKETCH_23_R)
        with Locations((-50, 23.1)):
            Circle(SKETCH_23_R)
        with Locations((-50, -23.1)):
            Circle(SKETCH_23_R)
        with Locations((50, 23.1)):
            Circle(SKETCH_23_R)
        with Locations((50, -23.1)):
            Circle(SKETCH_23_R)
        with Locations((150, 23.1)):
            Circle(SKETCH_23_R)
        with Locations((150, -23.1)):
            Circle(SKETCH_23_R)
    extrude(amount=-CUT_EXTRUDE_3_DEPTH, mode=Mode.SUBTRACT)

    # 草图24 → 凸台-拉伸1 (add)
    # profile 1 of 8: a face of its own
    with BuildSketch(Plane(origin=(0, 0, -1), x_dir=(-1, 0, 0), z_dir=(0, 0, -1))):
        with Locations(Location((-150, 23.1, 0), (0, 0, 180))):
            Circle(SKETCH_24_R)
        with Locations(Location((-150, 23.1, 0), (0, 0, 180))):
            Circle(SKETCH_24_R_2, mode=Mode.SUBTRACT)
    # profile 2 of 8: a face of its own
    with BuildSketch(Plane(origin=(0, 0, -1), x_dir=(-1, 0, 0), z_dir=(0, 0, -1))):
        with Locations(Location((-150, -23.1, 0), (0, 0, 180))):
            Circle(SKETCH_24_R)
        with Locations(Location((-150, -23.1, 0), (0, 0, 180))):
            Circle(SKETCH_24_R_2, mode=Mode.SUBTRACT)
    # profile 3 of 8: a face of its own
    with BuildSketch(Plane(origin=(0, 0, -1), x_dir=(-1, 0, 0), z_dir=(0, 0, -1))):
        with Locations(Location((-50, 23.1, 0), (0, 0, 180))):
            Circle(SKETCH_24_R)
        with Locations(Location((-50, 23.1, 0), (0, 0, 180))):
            Circle(SKETCH_24_R_2, mode=Mode.SUBTRACT)
    # profile 4 of 8: a face of its own
    with BuildSketch(Plane(origin=(0, 0, -1), x_dir=(-1, 0, 0), z_dir=(0, 0, -1))):
        with Locations(Location((-50, -23.1, 0), (0, 0, 180))):
            Circle(SKETCH_24_R)
        with Locations(Location((-50, -23.1, 0), (0, 0, 180))):
            Circle(SKETCH_24_R_2, mode=Mode.SUBTRACT)
    # profile 5 of 8: a face of its own
    with BuildSketch(Plane(origin=(0, 0, -1), x_dir=(-1, 0, 0), z_dir=(0, 0, -1))):
        with Locations(Location((50, 23.1, 0), (0, 0, 180))):
            Circle(SKETCH_24_R)
        with Locations(Location((50, 23.1, 0), (0, 0, 180))):
            Circle(SKETCH_24_R_2, mode=Mode.SUBTRACT)
    # profile 6 of 8: a face of its own
    with BuildSketch(Plane(origin=(0, 0, -1), x_dir=(-1, 0, 0), z_dir=(0, 0, -1))):
        with Locations(Location((50, -23.1, 0), (0, 0, 180))):
            Circle(SKETCH_24_R)
        with Locations(Location((50, -23.1, 0), (0, 0, 180))):
            Circle(SKETCH_24_R_2, mode=Mode.SUBTRACT)
    # profile 7 of 8: a face of its own
    with BuildSketch(Plane(origin=(0, 0, -1), x_dir=(-1, 0, 0), z_dir=(0, 0, -1))):
        with Locations(Location((150, 23.1, 0), (0, 0, 180))):
            Circle(SKETCH_24_R)
        with Locations(Location((150, 23.1, 0), (0, 0, 180))):
            Circle(SKETCH_24_R_2, mode=Mode.SUBTRACT)
    # profile 8 of 8: a face of its own
    with BuildSketch(Plane(origin=(0, 0, -1), x_dir=(-1, 0, 0), z_dir=(0, 0, -1))):
        with Locations(Location((150, -23.1, 0), (0, 0, 180))):
            Circle(SKETCH_24_R)
        with Locations(Location((150, -23.1, 0), (0, 0, 180))):
            Circle(SKETCH_24_R_2, mode=Mode.SUBTRACT)
    extrude(amount=EXTRUDE_1_DEPTH)


solid = part.part
